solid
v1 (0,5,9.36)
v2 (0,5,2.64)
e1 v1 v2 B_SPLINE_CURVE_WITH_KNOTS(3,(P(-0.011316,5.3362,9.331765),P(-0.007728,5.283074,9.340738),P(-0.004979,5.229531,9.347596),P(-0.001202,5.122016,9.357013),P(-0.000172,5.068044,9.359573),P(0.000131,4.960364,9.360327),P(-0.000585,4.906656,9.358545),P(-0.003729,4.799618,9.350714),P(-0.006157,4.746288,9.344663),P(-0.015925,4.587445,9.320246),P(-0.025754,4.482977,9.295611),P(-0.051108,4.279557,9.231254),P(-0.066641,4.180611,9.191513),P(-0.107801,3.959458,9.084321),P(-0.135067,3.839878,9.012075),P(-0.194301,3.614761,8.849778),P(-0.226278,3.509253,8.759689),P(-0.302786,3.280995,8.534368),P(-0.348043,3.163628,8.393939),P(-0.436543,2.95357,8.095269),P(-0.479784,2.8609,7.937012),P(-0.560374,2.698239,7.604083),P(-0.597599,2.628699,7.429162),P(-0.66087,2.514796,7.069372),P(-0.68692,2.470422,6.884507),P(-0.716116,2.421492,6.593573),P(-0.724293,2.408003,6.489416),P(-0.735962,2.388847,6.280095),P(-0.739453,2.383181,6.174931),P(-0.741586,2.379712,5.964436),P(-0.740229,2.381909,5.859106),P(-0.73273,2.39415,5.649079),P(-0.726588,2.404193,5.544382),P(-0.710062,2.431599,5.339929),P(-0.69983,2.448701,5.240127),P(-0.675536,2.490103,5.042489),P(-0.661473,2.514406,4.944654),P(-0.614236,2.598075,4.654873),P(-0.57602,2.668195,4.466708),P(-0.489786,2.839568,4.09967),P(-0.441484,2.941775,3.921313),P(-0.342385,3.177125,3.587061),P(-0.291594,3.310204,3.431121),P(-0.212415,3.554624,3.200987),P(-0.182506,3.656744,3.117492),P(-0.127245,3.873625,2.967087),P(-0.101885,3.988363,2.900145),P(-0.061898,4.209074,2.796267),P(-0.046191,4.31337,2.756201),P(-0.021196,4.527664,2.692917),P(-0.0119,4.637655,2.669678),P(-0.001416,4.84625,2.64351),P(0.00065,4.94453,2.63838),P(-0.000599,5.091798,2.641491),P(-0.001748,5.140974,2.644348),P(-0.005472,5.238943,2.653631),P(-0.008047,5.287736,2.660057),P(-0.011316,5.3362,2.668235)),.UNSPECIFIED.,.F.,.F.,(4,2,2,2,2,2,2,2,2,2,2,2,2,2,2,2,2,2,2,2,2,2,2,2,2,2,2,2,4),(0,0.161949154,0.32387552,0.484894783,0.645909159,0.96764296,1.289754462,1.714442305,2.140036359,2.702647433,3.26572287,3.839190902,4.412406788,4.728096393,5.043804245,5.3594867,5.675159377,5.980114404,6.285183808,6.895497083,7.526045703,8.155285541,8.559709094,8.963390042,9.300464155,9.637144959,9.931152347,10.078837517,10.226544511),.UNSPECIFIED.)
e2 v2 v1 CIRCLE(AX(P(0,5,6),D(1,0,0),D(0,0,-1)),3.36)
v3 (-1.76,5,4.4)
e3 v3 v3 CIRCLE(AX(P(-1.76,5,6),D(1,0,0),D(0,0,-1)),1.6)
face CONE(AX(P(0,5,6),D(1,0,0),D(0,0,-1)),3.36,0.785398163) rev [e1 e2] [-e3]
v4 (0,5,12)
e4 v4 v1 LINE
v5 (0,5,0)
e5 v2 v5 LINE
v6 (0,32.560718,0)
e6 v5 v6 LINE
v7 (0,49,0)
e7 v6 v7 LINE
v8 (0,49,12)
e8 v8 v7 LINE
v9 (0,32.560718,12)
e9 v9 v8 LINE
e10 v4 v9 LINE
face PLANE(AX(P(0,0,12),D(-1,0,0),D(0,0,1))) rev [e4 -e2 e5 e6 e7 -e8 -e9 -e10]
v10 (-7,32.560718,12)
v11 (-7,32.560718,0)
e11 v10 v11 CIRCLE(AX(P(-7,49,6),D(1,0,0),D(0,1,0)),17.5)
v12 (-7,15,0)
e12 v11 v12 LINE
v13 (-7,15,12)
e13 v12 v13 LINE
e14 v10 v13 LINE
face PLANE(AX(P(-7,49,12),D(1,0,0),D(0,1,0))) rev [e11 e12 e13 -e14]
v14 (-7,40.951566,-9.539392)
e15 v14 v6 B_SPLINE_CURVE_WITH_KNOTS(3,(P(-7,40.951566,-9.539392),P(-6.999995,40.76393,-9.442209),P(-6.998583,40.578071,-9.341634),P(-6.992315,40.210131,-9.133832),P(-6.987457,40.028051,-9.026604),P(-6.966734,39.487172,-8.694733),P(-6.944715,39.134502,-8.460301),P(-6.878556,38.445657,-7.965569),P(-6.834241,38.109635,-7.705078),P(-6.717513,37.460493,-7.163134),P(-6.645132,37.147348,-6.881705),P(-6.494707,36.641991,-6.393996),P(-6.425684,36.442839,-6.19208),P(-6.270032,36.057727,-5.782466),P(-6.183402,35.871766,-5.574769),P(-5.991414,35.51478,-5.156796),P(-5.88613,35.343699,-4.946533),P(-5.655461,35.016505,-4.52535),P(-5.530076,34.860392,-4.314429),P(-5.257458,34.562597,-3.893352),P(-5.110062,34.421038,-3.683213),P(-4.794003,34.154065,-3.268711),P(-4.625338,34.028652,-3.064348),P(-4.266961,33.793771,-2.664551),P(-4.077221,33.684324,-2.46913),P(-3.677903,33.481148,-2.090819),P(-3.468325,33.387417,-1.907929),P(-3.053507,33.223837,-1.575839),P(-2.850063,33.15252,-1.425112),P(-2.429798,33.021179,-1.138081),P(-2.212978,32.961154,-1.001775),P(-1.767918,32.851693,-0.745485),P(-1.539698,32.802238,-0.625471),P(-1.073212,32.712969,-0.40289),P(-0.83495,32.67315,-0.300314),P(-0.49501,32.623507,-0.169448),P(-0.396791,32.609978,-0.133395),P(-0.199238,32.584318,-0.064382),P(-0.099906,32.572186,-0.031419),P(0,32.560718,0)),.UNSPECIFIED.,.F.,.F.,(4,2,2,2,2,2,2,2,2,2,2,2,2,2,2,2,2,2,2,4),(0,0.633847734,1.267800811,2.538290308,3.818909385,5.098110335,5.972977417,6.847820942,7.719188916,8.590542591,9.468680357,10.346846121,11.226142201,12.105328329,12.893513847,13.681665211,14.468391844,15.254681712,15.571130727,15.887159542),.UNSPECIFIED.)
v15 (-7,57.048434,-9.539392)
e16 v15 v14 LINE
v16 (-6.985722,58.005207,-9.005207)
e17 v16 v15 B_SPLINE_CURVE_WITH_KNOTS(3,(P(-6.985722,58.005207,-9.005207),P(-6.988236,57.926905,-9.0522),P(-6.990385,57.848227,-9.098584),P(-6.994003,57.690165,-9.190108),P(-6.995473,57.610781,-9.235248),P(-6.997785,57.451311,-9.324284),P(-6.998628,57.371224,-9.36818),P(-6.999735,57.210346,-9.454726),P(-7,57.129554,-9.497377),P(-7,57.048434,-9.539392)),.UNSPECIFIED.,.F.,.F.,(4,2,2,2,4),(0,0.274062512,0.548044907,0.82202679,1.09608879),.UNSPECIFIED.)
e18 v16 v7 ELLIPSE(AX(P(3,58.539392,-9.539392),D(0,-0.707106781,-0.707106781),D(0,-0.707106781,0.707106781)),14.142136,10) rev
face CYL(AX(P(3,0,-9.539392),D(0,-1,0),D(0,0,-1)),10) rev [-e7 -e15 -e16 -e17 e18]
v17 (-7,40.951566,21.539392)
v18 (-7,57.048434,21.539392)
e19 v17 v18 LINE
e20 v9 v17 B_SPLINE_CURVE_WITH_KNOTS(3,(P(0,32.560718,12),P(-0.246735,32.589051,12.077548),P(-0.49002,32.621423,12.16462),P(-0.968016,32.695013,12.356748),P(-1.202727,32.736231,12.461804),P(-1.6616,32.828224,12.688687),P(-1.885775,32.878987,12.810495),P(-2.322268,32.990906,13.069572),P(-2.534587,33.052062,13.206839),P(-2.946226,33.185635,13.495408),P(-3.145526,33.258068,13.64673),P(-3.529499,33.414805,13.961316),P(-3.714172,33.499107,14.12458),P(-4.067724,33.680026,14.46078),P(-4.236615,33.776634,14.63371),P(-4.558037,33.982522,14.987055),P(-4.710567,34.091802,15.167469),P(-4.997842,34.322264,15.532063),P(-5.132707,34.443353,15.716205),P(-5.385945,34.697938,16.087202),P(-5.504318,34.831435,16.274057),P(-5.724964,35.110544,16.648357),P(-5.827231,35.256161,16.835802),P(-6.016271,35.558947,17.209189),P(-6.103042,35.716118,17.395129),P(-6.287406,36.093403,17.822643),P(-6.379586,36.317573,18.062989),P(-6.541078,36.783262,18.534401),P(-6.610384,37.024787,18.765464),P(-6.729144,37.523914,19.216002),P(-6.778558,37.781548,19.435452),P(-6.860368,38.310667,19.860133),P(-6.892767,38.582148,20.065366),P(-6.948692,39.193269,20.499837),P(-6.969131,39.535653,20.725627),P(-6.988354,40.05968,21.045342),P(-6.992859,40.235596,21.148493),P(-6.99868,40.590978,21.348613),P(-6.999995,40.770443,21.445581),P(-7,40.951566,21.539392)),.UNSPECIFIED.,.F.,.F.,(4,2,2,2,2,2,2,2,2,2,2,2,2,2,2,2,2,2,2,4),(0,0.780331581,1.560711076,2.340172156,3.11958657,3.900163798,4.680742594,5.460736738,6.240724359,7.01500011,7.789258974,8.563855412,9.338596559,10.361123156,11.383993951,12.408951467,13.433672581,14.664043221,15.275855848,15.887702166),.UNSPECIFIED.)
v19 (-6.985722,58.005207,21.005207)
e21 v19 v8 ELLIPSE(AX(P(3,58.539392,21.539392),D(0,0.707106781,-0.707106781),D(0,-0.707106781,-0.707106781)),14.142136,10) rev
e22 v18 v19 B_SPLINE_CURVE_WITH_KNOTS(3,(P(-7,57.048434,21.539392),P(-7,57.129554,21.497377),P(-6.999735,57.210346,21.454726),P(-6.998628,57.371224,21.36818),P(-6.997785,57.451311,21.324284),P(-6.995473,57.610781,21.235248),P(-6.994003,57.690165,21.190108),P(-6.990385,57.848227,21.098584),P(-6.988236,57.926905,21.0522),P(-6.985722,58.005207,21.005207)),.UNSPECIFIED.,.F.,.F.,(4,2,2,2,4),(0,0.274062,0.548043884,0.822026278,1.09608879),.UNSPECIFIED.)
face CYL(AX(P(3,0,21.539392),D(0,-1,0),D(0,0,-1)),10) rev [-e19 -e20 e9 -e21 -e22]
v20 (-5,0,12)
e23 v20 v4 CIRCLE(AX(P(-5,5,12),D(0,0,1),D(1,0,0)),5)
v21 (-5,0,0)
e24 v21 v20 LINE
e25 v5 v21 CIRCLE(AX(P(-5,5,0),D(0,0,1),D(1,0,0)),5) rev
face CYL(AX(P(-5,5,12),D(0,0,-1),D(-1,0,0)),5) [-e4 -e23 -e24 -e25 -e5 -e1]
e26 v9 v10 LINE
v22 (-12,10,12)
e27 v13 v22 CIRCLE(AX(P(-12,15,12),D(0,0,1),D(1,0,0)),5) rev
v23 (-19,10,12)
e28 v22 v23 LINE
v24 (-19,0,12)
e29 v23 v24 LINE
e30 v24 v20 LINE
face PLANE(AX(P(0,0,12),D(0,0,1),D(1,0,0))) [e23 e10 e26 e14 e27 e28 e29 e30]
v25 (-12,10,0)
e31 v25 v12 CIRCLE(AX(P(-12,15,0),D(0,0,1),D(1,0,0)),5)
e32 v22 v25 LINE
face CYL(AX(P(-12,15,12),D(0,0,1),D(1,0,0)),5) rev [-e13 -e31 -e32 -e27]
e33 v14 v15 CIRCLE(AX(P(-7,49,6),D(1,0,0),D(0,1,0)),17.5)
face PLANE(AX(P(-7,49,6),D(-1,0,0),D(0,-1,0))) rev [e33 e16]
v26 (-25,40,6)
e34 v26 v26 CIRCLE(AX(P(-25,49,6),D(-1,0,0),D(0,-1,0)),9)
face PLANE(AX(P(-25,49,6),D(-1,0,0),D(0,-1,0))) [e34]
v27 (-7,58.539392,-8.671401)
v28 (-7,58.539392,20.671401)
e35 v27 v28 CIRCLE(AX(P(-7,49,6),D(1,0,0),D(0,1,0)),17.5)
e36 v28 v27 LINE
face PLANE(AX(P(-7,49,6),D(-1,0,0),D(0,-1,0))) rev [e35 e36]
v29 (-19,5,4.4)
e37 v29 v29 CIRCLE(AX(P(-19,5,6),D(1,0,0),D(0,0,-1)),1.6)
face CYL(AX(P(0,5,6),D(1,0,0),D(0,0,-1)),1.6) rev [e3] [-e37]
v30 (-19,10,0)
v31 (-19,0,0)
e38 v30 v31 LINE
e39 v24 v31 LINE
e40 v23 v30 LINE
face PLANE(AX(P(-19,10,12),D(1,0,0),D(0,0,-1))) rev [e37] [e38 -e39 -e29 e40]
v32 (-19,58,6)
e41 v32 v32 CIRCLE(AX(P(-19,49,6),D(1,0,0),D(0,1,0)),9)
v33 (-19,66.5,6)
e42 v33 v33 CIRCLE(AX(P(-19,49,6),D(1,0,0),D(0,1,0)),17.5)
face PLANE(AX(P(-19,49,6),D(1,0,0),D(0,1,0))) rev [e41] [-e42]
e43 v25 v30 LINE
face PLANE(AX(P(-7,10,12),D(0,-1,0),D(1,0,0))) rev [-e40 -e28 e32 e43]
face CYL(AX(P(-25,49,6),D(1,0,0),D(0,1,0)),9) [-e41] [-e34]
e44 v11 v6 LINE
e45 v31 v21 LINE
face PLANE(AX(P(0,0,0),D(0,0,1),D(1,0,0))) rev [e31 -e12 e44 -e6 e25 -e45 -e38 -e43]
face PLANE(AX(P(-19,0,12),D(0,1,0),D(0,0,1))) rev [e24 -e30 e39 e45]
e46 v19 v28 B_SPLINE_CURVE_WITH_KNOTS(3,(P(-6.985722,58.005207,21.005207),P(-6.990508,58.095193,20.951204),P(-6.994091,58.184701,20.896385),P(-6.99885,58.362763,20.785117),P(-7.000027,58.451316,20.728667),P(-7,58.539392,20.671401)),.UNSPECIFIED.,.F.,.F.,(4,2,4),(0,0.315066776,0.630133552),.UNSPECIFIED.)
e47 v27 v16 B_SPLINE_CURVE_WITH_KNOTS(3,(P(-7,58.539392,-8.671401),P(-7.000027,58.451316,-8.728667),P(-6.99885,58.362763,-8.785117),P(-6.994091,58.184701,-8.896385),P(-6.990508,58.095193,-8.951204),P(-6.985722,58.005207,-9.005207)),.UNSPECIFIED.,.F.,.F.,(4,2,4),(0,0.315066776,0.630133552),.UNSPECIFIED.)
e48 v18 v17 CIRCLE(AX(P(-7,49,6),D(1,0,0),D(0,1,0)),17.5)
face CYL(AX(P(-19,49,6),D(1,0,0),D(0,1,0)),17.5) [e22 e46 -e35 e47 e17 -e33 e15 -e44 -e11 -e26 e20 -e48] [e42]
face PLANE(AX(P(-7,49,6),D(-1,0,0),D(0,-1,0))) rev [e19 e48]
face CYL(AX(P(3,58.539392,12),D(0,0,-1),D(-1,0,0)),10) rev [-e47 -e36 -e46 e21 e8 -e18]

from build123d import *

# Parameters (mm, degrees)
BOSS_EXTRUDE1_DEPTH           = 12
FILLET2_R                     = 5
CSK_FOR_M3_SFHCS1_D           = 3.2
CSK_FOR_M3_SFHCS1_DEPTH       = 20
CSK_FOR_M3_SFHCS1_CSINK_D     = 6.72
CSK_FOR_M3_SFHCS1_CSINK_ANGLE = 90
CSK_FOR_M3_SFHCS1_TIP         = 0.96137699
SKETCH2_R                     = 9
BOSS_EXTRUDE2_DEPTH           = 18
SKETCH5_R                     = 17.5
BOSS_EXTRUDE3_DEPTH           = 12
FILLET3_R                     = 10


with BuildPart() as part:
    # Sketch1 → Boss-Extrude1 (new body)
    with BuildSketch(Plane.XY):
        Polygon((-7, 10), (-19, 10), (-19, 0), (0, 0), (0, 49), (-7, 49), align=None)
    extrude(amount=BOSS_EXTRUDE1_DEPTH)

    # Fillet2
    fillet2_edges = [part.edges().sort_by_distance(p)[0] for p in [
        (-7, 10, 6),
        (0, 0, 6),
    ]]
    fillet(fillet2_edges, radius=FILLET2_R)

    # CSK for M3 SFHCS1
    with Locations(Plane(origin=(0, 0, 0), x_dir=(0, 0, -1), z_dir=(1, 0, 0))):
        with Locations((-6, 5)):
            CounterSinkHole(CSK_FOR_M3_SFHCS1_D / 2, CSK_FOR_M3_SFHCS1_CSINK_D / 2, depth=CSK_FOR_M3_SFHCS1_DEPTH, counter_sink_angle=CSK_FOR_M3_SFHCS1_CSINK_ANGLE)
            with Locations((0, 0, -(CSK_FOR_M3_SFHCS1_DEPTH + CSK_FOR_M3_SFHCS1_TIP / 2))):  # 118° drill point
                Cone(0, CSK_FOR_M3_SFHCS1_D / 2, CSK_FOR_M3_SFHCS1_TIP, mode=Mode.SUBTRACT)

    # Sketch2 → Boss-Extrude2 (add)
    with BuildSketch(Plane.ZY.offset(7)):
        with Locations(Location((6, 49, 0), (0, 0, 228.189685104))):
            Circle(SKETCH2_R)
    extrude(amount=BOSS_EXTRUDE2_DEPTH)

    # Sketch5 → Boss-Extrude3 (add)
    with BuildSketch(Plane(origin=(-7, 0, 0), x_dir=(0, 0, -1), z_dir=(1, 0, 0))):
        with Locations(Location((-6, 49, 0), (0, 0, 90))):
            Circle(SKETCH5_R)
    extrude(amount=-BOSS_EXTRUDE3_DEPTH)

    # Fillet3
    # the kernel refuses this fillet: 10 mm, written as the material it adds along each edge
    with BuildSketch(Plane(origin=(-7, 8.712237742, 0), x_dir=(0, 0, -1), z_dir=(0, 1, 0))) as fillet3_piece_1_section:
        with BuildLine():
            CenterArc((9.539392014, -10), FILLET3_R, 90, 72.542396876)
            Line((0, -7), (0, 0))
            Line((0, 0), (9.539392014, 0))
        make_face()
    fillet3_piece_1 = extrude(amount=40.287762258, mode=Mode.PRIVATE)
    fillet3_piece_1 = fillet3_piece_1 & Plane(origin=(-7, 49, 6), x_dir=(0, 1, 0), z_dir=(1, 0, 0)) * Cylinder(17.5, 119, mode=Mode.PRIVATE)
    add(fillet3_piece_1)
    with BuildSketch(Plane(origin=(-7, 49, 0), x_dir=(0, 1, 0), z_dir=(0, 0, 1))) as fillet3_piece_2:
        with BuildLine():
            CenterArc((9.539392014, -10), FILLET3_R, 90, 72.542396876)
            Line((0, -7), (0, 0))
            Line((0, 0), (9.539392014, 0))
        make_face()
    extrude(amount=12)
    with BuildSketch(Plane(origin=(-7, 49, 12), x_dir=(1, 0, 0), z_dir=(0, -1, 0))) as fillet3_piece_3_section:
        with BuildLine():
            CenterArc((10, 9.539392014), FILLET3_R, 180, 72.542396876)
            Line((0, 9.539392014), (0, 0))
            Line((0, 0), (7, 0))
        make_face()
    fillet3_piece_3 = extrude(amount=40.287762258, mode=Mode.PRIVATE)
    fillet3_piece_3 = fillet3_piece_3 & Plane(origin=(-7, 49, 6), x_dir=(0, 1, 0), z_dir=(1, 0, 0)) * Cylinder(17.5, 119, mode=Mode.PRIVATE)
    add(fillet3_piece_3)
    with BuildSketch(Plane(origin=(-7, 8.712237742, 0), x_dir=(0, 0, -1), z_dir=(0, 1, 0))) as fillet3_piece_4a_section:
        with BuildLine():
            CenterArc((9.539392014, -10), FILLET3_R, 90, 72.542396876)
            Line((0, -7), (0, 0))
            Line((0, 0), (9.539392014, 0))
        make_face()
    fillet3_piece_4a = extrude(amount=64.136242294, mode=Mode.PRIVATE)
    fillet3_piece_4a = fillet3_piece_4a & Plane(origin=(-7, 49, 6), x_dir=(0, 1, 0), z_dir=(1, 0, 0)) * Cylinder(17.5, 167, mode=Mode.PRIVATE)
    fillet3_piece_4a = split(fillet3_piece_4a, bisect_by=Plane(origin=(-7, 49, 0), z_dir=(0, 1, 0)), keep=Keep.TOP, mode=Mode.PRIVATE)
    with BuildSketch(Plane(origin=(-7, 49, -23.848480035), x_dir=(0, 1, 0), z_dir=(0, 0, 1))) as fillet3_piece_4b_section:
        with BuildLine():
            CenterArc((9.539392014, -10), FILLET3_R, 90, 72.542396876)
            Line((0, -7), (0, 0))
            Line((0, 0), (9.539392014, 0))
        make_face()
    fillet3_piece_4b = extrude(amount=35.848480035, mode=Mode.PRIVATE)
    fillet3_piece_4b = fillet3_piece_4b & Plane(origin=(-7, 49, 6), x_dir=(0, 1, 0), z_dir=(1, 0, 0)) * Cylinder(17.5, 110, mode=Mode.PRIVATE)
    fillet3_piece_4b = split(fillet3_piece_4b, bisect_by=Plane(origin=(-7, 49, 0), z_dir=(0, 0, -1)), keep=Keep.TOP, mode=Mode.PRIVATE)
    fillet3_piece_4 = fillet3_piece_4a & fillet3_piece_4b
    add(fillet3_piece_4)
    with BuildSketch(Plane(origin=(-7, 72.848480035, 12), x_dir=(1, 0, 0), z_dir=(0, -1, 0))) as fillet3_piece_5a_section:
        with BuildLine():
            CenterArc((10, 9.539392014), FILLET3_R, 180, 72.542396876)
            Line((0, 9.539392014), (0, 0))
            Line((0, 0), (7, 0))
        make_face()
    fillet3_piece_5a = extrude(amount=64.136242294, mode=Mode.PRIVATE)
    fillet3_piece_5a = fillet3_piece_5a & Plane(origin=(-7, 49, 6), x_dir=(0, 1, 0), z_dir=(1, 0, 0)) * Cylinder(17.5, 167, mode=Mode.PRIVATE)
    fillet3_piece_5a = split(fillet3_piece_5a, bisect_by=Plane(origin=(-7, 49, 12), z_dir=(0, 1, 0)), keep=Keep.TOP, mode=Mode.PRIVATE)
    with BuildSketch(Plane(origin=(-7, 49, 0), x_dir=(0, 1, 0), z_dir=(0, 0, 1))) as fillet3_piece_5b_section:
        with BuildLine():
            CenterArc((9.539392014, -10), FILLET3_R, 90, 72.542396876)
            Line((0, -7), (0, 0))
            Line((0, 0), (9.539392014, 0))
        make_face()
    fillet3_piece_5b = extrude(amount=35.848480035, mode=Mode.PRIVATE)
    fillet3_piece_5b = split(fillet3_piece_5b, bisect_by=Plane(origin=(-7, 49, 12), z_dir=(0, 0, 1)), keep=Keep.TOP, mode=Mode.PRIVATE)
    fillet3_piece_5b = fillet3_piece_5b & Plane(origin=(-7, 49, 6), x_dir=(0, 1, 0), z_dir=(1, 0, 0)) * Cylinder(17.5, 110, mode=Mode.PRIVATE)
    fillet3_piece_5 = fillet3_piece_5a & fillet3_piece_5b
    add(fillet3_piece_5)


solid = part.part
